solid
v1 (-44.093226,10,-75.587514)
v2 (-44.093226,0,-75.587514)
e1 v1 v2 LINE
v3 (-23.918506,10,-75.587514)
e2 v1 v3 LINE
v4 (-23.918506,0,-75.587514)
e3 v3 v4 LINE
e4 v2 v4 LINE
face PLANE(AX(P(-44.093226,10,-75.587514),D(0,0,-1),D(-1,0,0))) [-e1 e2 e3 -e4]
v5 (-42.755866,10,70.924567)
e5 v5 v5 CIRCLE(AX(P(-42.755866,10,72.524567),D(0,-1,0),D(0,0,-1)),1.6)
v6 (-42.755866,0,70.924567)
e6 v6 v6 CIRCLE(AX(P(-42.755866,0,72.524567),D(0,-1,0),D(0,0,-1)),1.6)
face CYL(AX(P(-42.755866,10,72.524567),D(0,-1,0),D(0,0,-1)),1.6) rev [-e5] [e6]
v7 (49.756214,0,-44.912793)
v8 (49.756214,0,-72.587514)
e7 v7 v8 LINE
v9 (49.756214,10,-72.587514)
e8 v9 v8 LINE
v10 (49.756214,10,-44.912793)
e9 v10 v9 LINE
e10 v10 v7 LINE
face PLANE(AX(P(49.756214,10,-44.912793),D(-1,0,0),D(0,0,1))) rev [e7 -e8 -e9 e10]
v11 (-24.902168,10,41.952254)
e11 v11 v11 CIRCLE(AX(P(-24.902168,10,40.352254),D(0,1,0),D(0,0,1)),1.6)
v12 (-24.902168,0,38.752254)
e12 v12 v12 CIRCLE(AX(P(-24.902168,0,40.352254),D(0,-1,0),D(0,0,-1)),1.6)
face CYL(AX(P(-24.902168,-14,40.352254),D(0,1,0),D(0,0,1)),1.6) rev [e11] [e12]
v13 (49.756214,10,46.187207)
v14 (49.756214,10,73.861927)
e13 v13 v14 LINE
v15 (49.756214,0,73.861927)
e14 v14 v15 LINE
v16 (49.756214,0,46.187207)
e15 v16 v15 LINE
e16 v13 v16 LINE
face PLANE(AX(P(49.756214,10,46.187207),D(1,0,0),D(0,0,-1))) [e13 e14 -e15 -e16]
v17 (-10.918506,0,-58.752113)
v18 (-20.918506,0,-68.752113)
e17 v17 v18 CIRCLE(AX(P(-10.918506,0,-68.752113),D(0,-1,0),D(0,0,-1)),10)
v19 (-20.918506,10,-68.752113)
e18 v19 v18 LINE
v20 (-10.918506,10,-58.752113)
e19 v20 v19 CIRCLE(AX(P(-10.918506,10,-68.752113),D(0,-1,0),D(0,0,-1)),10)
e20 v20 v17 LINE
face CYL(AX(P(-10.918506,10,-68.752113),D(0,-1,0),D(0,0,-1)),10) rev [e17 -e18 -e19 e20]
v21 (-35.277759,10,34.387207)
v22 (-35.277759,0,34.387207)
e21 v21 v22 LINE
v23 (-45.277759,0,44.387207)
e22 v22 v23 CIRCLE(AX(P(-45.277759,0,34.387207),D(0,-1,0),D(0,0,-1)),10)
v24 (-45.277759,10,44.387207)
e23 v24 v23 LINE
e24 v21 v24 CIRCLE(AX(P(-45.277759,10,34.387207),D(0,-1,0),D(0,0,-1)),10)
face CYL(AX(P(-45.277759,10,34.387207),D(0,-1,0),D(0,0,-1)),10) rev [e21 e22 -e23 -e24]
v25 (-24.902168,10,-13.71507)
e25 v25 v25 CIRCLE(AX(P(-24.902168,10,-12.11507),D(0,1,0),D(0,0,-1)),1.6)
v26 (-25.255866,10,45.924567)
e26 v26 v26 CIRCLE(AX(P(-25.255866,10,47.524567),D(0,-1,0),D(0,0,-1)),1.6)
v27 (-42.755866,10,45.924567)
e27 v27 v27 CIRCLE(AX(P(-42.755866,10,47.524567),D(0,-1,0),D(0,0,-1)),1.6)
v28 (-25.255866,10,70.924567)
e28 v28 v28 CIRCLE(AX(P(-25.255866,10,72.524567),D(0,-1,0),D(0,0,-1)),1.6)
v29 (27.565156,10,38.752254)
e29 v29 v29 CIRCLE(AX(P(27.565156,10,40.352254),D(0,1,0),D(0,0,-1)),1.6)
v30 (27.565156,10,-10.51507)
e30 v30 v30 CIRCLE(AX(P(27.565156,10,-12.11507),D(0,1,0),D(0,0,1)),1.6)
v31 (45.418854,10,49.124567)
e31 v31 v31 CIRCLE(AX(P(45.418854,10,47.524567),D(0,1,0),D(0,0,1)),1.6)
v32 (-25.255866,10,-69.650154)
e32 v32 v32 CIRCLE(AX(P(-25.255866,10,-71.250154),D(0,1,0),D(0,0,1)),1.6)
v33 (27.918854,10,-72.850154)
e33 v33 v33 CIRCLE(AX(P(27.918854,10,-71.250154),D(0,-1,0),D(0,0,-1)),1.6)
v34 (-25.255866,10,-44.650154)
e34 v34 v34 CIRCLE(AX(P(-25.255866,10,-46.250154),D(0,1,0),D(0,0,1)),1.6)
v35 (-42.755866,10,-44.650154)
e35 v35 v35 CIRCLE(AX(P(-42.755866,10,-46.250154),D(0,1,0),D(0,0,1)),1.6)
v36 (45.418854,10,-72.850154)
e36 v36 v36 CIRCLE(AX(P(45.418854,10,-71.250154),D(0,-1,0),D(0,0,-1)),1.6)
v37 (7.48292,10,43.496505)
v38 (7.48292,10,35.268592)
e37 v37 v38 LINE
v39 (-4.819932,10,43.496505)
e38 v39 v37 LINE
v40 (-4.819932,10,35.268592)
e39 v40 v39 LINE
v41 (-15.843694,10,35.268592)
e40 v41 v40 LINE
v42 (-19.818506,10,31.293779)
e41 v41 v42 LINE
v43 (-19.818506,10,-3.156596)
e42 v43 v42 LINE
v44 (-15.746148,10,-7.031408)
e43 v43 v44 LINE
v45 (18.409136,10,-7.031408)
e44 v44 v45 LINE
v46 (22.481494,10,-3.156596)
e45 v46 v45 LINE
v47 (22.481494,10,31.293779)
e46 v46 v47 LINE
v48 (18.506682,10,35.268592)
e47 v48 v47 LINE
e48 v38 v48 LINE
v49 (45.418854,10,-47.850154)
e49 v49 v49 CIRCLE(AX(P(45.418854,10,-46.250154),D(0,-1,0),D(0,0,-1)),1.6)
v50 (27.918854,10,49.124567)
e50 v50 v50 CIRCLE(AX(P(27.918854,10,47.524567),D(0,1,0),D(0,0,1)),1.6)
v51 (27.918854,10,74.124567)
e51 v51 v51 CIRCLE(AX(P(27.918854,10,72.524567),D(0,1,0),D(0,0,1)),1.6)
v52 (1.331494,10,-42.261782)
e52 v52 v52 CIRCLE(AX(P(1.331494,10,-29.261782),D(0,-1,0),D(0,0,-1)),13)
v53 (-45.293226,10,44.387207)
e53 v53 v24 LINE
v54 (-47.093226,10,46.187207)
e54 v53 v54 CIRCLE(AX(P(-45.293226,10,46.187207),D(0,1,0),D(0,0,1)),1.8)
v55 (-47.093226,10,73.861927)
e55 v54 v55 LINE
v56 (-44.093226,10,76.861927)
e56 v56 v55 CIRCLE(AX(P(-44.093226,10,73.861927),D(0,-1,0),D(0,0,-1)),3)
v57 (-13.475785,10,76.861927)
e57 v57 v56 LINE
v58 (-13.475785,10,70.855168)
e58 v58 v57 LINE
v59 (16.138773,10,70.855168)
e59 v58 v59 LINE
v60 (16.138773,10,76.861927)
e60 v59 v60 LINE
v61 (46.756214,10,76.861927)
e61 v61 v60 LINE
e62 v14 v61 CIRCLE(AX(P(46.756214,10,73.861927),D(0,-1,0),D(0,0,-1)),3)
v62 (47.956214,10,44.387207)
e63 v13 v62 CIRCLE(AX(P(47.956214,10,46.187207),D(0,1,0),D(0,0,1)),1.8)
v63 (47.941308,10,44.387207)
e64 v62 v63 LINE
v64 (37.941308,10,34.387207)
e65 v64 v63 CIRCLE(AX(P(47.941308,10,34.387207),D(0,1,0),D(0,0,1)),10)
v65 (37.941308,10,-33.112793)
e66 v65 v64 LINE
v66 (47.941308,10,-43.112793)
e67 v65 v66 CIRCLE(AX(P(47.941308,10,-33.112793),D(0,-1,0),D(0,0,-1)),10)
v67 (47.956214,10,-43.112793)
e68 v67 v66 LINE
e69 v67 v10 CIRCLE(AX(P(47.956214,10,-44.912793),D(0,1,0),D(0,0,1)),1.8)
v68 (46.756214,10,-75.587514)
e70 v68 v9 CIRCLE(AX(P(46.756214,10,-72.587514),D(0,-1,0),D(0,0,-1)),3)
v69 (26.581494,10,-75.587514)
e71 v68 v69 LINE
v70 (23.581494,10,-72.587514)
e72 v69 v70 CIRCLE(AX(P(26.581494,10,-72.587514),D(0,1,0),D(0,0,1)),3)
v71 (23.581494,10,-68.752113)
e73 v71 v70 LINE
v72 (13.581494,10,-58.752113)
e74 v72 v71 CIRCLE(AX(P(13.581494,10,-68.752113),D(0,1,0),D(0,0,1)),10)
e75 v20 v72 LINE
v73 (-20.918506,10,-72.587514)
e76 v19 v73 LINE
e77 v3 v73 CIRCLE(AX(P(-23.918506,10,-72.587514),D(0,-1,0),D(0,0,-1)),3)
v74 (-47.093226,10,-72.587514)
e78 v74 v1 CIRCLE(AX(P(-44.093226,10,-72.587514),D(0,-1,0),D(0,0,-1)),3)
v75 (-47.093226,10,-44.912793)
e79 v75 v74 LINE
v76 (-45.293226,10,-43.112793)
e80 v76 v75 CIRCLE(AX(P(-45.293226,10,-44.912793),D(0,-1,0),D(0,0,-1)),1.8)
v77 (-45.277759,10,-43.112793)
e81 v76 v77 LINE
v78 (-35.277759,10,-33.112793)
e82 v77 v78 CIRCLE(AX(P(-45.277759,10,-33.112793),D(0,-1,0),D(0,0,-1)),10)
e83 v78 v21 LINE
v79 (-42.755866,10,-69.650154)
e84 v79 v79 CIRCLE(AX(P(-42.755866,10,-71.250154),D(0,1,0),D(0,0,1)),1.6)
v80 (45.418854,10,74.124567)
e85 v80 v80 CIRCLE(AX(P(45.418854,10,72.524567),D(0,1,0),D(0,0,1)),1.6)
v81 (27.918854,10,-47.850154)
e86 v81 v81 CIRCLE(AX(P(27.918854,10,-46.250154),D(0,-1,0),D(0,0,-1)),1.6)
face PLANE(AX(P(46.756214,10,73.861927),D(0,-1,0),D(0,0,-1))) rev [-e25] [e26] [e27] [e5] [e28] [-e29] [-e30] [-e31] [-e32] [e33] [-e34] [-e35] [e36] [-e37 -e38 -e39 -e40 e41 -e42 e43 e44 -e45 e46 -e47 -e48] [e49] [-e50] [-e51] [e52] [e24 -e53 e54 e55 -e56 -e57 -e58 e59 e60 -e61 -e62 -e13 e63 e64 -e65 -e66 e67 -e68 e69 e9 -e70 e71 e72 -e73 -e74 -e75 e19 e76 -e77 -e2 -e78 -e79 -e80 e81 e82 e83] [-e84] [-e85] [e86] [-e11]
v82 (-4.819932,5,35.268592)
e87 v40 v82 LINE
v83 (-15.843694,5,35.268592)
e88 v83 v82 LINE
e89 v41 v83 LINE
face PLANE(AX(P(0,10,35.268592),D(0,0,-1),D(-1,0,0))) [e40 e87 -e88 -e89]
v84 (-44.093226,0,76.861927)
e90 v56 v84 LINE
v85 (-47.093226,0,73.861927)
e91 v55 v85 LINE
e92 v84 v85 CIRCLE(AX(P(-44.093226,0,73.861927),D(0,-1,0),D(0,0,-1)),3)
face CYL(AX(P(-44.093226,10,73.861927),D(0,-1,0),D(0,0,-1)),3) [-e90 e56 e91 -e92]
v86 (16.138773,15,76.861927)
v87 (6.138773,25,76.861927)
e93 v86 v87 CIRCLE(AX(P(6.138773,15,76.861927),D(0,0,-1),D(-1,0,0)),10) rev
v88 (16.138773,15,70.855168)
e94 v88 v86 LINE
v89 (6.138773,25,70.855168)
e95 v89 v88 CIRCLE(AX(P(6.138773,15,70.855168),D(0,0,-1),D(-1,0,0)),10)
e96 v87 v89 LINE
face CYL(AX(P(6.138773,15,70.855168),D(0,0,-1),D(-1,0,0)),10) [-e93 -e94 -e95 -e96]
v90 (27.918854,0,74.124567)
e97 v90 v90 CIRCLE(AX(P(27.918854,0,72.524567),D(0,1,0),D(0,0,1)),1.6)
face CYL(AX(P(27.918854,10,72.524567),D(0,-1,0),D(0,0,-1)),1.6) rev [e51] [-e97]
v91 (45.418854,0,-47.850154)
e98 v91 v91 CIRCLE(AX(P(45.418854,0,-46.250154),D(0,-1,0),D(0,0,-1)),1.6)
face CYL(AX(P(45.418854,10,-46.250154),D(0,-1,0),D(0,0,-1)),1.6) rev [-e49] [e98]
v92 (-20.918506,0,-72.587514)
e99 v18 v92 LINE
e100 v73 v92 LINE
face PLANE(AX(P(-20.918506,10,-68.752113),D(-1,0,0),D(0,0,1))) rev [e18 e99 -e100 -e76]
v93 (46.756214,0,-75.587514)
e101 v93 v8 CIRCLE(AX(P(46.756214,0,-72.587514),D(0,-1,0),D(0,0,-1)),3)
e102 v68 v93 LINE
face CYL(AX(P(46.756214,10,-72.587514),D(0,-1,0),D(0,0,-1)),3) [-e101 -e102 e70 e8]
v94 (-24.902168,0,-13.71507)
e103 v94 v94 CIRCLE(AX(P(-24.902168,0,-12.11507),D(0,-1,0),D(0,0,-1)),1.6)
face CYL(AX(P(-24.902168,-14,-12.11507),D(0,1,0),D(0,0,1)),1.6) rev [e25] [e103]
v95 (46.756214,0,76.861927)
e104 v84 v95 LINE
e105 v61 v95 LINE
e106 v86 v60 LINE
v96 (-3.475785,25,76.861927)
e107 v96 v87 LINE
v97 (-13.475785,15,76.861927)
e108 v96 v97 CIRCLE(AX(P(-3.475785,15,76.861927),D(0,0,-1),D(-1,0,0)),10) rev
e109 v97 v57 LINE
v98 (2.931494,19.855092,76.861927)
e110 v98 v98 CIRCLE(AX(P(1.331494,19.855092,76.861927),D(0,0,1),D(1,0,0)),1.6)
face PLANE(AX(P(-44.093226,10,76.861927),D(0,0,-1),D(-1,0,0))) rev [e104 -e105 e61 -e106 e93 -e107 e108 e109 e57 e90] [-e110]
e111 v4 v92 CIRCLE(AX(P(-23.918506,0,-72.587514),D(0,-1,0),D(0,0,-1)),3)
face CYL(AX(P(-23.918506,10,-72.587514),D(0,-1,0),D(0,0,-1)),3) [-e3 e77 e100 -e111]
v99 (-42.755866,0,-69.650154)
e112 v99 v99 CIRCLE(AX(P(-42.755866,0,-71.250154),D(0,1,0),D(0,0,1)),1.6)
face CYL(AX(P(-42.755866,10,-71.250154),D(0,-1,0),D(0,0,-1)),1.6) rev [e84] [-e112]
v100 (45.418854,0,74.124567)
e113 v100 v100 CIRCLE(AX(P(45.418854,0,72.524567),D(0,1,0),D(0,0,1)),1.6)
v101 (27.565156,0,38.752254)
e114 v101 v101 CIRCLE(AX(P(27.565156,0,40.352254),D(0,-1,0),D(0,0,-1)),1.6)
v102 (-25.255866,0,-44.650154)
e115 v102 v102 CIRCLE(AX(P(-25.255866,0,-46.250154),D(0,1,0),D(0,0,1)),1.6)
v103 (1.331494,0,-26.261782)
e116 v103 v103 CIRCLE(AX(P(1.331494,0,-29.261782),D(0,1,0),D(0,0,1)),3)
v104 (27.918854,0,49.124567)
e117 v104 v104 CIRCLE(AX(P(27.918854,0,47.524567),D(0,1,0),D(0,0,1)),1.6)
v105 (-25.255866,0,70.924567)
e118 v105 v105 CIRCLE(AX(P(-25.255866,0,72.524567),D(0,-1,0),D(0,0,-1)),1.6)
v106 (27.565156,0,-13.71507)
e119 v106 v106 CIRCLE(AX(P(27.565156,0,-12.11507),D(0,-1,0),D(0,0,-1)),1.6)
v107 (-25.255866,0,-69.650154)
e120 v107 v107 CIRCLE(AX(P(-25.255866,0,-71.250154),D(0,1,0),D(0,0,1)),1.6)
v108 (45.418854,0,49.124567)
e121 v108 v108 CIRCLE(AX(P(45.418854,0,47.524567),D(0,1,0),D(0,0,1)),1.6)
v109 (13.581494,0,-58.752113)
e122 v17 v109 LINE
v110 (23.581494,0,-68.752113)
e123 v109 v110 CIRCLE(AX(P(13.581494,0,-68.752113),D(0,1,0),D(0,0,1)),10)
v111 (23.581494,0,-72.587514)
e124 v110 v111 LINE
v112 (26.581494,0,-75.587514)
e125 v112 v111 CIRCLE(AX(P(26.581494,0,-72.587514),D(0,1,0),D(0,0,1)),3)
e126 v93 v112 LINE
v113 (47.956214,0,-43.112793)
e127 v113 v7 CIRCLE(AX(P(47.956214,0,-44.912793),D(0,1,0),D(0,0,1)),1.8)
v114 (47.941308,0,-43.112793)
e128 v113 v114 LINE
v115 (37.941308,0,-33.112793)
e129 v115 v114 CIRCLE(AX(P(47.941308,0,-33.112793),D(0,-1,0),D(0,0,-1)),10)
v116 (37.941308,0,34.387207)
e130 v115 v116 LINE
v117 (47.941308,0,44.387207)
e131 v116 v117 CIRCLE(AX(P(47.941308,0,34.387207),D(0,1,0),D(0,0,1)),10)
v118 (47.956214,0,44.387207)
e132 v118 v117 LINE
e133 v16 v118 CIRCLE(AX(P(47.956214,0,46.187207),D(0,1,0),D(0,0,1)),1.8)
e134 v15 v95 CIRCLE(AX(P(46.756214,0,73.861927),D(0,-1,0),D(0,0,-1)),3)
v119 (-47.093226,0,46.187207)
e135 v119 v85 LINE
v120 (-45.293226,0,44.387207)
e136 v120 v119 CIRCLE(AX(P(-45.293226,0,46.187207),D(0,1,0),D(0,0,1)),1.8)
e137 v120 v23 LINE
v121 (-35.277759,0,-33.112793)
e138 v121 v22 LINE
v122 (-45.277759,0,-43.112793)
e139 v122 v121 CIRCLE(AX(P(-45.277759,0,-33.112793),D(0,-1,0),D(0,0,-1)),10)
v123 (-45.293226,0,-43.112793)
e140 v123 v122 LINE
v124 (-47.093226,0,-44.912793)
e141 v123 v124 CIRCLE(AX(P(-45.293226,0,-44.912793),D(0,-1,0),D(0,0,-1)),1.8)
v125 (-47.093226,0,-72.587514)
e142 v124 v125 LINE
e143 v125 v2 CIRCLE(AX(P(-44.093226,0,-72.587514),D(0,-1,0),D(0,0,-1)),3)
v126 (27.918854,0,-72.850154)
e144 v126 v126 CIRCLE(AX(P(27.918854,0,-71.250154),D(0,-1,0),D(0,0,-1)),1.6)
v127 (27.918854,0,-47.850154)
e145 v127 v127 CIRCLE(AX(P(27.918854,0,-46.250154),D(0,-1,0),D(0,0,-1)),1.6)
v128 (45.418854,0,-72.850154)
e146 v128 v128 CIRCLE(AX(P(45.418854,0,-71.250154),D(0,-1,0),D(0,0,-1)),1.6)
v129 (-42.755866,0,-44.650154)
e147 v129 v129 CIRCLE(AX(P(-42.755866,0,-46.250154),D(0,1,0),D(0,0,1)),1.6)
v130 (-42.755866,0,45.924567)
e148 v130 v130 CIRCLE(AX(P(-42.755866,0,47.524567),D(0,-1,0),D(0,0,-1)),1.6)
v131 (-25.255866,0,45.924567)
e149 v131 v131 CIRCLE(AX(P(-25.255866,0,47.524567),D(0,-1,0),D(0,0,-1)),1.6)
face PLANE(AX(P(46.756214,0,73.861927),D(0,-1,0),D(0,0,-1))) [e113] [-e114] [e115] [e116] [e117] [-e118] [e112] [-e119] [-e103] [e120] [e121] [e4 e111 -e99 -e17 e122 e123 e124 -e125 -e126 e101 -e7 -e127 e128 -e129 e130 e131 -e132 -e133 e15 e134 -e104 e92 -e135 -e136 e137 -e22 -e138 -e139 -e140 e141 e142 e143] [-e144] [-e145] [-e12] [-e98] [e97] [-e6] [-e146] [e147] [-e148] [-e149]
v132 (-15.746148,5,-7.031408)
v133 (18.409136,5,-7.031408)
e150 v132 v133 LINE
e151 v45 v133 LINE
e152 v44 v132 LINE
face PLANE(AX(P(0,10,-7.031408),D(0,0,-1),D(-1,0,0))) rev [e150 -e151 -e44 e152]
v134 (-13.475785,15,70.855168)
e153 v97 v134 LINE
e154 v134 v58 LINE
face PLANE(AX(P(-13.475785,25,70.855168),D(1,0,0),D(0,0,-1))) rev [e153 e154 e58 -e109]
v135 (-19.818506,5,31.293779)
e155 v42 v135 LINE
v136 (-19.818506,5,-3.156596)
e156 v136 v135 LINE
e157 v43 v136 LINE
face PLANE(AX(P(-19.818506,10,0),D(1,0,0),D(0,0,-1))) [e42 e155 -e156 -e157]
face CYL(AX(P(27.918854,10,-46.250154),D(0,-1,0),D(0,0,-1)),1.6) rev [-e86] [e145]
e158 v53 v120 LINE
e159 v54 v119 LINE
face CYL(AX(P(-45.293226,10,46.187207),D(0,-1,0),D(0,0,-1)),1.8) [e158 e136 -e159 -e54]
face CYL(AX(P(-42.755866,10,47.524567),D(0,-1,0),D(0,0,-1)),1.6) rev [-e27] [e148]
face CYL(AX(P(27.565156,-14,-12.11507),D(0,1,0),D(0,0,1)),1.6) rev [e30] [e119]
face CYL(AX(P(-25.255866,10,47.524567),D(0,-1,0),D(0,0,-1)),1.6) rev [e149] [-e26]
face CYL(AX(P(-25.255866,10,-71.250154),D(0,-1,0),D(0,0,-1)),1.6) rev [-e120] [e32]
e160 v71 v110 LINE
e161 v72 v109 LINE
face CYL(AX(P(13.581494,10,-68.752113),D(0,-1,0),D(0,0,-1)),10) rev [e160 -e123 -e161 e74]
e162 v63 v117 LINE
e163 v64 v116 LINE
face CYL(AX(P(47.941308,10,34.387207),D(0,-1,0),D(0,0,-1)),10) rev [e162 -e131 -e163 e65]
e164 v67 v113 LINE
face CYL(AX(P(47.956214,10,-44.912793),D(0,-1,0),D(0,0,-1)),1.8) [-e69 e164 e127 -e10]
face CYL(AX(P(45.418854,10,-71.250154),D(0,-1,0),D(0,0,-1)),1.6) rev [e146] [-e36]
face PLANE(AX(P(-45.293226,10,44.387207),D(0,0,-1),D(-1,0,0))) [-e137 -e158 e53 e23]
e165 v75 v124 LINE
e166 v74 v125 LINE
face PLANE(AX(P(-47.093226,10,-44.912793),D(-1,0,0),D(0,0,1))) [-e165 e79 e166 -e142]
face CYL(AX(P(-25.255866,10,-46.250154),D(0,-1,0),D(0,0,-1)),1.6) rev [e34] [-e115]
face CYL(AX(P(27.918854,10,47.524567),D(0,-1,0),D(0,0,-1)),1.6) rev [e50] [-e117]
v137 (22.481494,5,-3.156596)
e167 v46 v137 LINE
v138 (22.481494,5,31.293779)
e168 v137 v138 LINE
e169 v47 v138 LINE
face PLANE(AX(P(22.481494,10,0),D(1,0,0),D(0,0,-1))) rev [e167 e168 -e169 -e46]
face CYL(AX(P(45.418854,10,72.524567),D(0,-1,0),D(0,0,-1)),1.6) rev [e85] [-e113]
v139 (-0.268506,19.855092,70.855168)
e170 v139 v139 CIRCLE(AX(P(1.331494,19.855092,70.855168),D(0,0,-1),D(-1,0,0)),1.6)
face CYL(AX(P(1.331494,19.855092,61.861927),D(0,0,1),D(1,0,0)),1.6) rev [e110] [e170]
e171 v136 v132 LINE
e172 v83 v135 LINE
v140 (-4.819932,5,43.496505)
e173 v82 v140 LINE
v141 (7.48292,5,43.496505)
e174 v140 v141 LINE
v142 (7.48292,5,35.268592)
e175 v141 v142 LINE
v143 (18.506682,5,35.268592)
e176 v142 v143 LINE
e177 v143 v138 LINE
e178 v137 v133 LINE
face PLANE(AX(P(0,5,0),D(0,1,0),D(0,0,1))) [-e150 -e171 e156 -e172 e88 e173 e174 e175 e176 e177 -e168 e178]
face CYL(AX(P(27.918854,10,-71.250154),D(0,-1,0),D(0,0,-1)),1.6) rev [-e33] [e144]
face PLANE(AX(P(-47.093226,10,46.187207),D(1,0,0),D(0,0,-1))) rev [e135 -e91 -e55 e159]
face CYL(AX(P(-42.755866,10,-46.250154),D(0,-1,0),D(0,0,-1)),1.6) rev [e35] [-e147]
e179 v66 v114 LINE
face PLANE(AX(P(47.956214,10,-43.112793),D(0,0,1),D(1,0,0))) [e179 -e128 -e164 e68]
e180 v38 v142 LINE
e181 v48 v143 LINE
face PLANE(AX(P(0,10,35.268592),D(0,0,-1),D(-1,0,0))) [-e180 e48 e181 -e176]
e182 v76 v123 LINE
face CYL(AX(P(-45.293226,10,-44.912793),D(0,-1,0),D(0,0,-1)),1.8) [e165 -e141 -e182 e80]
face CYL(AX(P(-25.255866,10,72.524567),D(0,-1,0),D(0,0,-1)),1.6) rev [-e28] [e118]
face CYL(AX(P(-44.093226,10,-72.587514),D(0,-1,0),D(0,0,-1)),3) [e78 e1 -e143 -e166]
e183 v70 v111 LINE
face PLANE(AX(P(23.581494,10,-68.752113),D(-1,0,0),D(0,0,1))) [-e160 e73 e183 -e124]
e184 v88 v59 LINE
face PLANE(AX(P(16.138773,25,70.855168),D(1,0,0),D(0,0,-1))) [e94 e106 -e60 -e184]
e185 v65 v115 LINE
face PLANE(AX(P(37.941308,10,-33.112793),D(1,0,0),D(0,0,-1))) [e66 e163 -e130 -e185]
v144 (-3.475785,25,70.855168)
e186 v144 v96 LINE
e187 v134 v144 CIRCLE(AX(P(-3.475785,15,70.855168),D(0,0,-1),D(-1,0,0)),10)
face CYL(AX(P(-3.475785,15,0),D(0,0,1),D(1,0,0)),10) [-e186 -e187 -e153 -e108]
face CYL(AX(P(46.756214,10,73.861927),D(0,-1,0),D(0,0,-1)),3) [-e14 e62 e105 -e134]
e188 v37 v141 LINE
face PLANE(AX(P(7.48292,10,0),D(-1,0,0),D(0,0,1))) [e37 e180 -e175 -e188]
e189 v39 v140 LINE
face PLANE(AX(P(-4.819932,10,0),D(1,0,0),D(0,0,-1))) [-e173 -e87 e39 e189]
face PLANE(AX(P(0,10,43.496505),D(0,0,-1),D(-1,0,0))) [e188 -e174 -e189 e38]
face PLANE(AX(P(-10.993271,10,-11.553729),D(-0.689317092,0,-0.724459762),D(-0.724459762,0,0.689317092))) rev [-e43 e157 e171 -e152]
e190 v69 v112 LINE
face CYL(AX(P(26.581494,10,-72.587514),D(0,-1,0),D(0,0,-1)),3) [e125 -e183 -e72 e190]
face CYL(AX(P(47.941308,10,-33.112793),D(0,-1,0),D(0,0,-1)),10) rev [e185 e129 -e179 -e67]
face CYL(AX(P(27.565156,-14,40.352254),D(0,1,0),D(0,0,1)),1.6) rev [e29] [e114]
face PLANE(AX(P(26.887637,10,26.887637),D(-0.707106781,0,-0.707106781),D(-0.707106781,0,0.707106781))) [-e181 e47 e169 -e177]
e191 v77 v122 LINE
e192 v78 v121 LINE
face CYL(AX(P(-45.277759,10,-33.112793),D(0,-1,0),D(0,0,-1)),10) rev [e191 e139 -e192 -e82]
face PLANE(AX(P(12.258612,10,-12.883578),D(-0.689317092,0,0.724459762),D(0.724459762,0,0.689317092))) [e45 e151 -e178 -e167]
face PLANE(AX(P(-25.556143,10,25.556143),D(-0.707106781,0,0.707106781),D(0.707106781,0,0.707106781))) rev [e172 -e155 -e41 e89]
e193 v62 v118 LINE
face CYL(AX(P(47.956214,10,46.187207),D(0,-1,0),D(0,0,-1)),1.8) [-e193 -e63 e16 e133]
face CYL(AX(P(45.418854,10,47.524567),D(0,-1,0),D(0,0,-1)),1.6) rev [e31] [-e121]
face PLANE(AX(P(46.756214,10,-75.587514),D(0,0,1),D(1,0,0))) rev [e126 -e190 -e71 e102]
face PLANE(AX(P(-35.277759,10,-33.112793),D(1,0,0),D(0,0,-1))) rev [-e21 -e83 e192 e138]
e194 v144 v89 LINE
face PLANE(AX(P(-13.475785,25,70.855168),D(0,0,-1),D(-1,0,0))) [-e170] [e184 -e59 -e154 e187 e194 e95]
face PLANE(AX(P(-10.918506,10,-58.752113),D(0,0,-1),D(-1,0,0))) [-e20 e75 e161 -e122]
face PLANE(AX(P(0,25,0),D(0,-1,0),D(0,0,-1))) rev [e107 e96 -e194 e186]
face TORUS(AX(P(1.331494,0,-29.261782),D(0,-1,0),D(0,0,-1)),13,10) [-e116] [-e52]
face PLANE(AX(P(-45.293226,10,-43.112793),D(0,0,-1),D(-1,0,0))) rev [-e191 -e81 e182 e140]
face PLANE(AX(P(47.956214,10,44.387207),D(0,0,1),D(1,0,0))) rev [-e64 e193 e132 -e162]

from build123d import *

# Parameters (mm, degrees)
SKETCH1_R           = 1.6
SKETCH1_R_2         = 3
BOSS_EXTRUDE1_DEPTH = 10
BOSS_EXTRUDE2_DEPTH = 5
SKETCH3_R           = 1.6
CUT_EXTRUDE2_DEPTH  = 24
FILLET1_R           = 10
SKETCH4_W           = 29.614558854
SKETCH4_H           = 6.006759352
BOSS_EXTRUDE3_DEPTH = 15
FILLET2_R           = 10
SKETCH5_R           = 1.6
CUT_EXTRUDE3_DEPTH  = 15


with BuildPart() as part:
    # Sketch1 → Boss-Extrude1 (new body)
    with BuildSketch(Plane(origin=(0, 0, 0), x_dir=(1, 0, 0), z_dir=(0, 1, 0))):
        with BuildLine():
            Line((13.581493994, 58.752113328), (-10.918506006, 58.752113328))
            ThreePointArc((-10.918506006, 58.752113328), (-17.989573818, 61.681045517), (-20.918506006, 68.752113328))
            Line((-20.918506006, 68.752113328), (-20.918506006, 72.587513875))
            ThreePointArc((-20.918506006, 72.587513875), (-21.797185662, 74.708834218), (-23.918506006, 75.587513875))
            Line((-23.918506006, 75.587513875), (-44.093226465, 75.587513875))
            ThreePointArc((-44.093226465, 75.587513875), (-46.214546809, 74.708834218), (-47.093226465, 72.587513875))
            Line((-47.093226465, 72.587513875), (-47.093226465, 44.912793415))
            ThreePointArc((-47.093226465, 44.912793415), (-46.566018672, 43.640001209), (-45.293226465, 43.112793415))
            Line((-45.293226465, 43.112793415), (-45.277758982, 43.112793415))
            ThreePointArc((-45.277758982, 43.112793415), (-38.20669117, 40.183861227), (-35.277758982, 33.112793415))
            Line((-35.277758982, 33.112793415), (-35.277758982, -34.387206585))
            ThreePointArc((-35.277758982, -34.387206585), (-38.20669117, -41.458274396), (-45.277758982, -44.387206585))
            Line((-45.277758982, -44.387206585), (-45.293226465, -44.387206585))
            ThreePointArc((-45.293226465, -44.387206585), (-46.566018672, -44.914414378), (-47.093226465, -46.187206585))
            Line((-47.093226465, -46.187206585), (-47.093226465, -73.861927044))
            ThreePointArc((-47.093226465, -73.861927044), (-46.214546809, -75.983247388), (-44.093226465, -76.861927044))
            Line((-44.093226465, -76.861927044), (46.756214453, -76.861927044))
            ThreePointArc((46.756214453, -76.861927044), (48.877534797, -75.983247388), (49.756214453, -73.861927044))
            Line((49.756214453, -73.861927044), (49.756214453, -46.187206585))
            ThreePointArc((49.756214453, -46.187206585), (49.22900666, -44.914414378), (47.956214453, -44.387206585))
            Line((47.956214453, -44.387206585), (47.94130771, -44.387206585))
            ThreePointArc((47.94130771, -44.387206585), (40.870239898, -41.458274396), (37.94130771, -34.387206585))
            Line((37.94130771, -34.387206585), (37.94130771, 33.112793415))
            ThreePointArc((37.94130771, 33.112793415), (40.870239898, 40.183861227), (47.94130771, 43.112793415))
            Line((47.94130771, 43.112793415), (47.956214453, 43.112793415))
            ThreePointArc((47.956214453, 43.112793415), (49.22900666, 43.640001209), (49.756214453, 44.912793415))
            Line((49.756214453, 44.912793415), (49.756214453, 72.587513875))
            ThreePointArc((49.756214453, 72.587513875), (48.877534797, 74.708834218), (46.756214453, 75.587513875))
            Line((46.756214453, 75.587513875), (26.581493994, 75.587513875))
            ThreePointArc((26.581493994, 75.587513875), (24.46017365, 74.708834218), (23.581493994, 72.587513875))
            Line((23.581493994, 72.587513875), (23.581493994, 68.752113328))
            ThreePointArc((23.581493994, 68.752113328), (20.652561806, 61.681045517), (13.581493994, 58.752113328))
        make_face()
        with Locations(Location((-42.755866236, -47.524566814, 0), (0, 0, 90))):
            Circle(SKETCH1_R, mode=Mode.SUBTRACT)
        with Locations(Location((-25.255866236, -47.524566814, 0), (0, 0, 90))):
            Circle(SKETCH1_R, mode=Mode.SUBTRACT)
        with Locations(Location((-25.255866236, -72.524566814, 0), (0, 0, 90))):
            Circle(SKETCH1_R, mode=Mode.SUBTRACT)
        with Locations(Location((-42.755866236, -72.524566814, 0), (0, 0, 90))):
            Circle(SKETCH1_R, mode=Mode.SUBTRACT)
        Polygon((-15.746148386, 7.031408071), (18.409136374, 7.031408071), (22.481493994, 3.156595611), (22.481493994, -31.29377947), (18.506681534, -35.268591929), (7.482919934, -35.268591929), (7.482919934, -43.496504735), (-4.819931946, -43.496504735), (-4.819931946, -35.268591929), (-15.843693546, -35.268591929), (-19.818506006, -31.29377947), (-19.818506006, 3.156595611), align=None, mode=Mode.SUBTRACT)
        with Locations(Location((45.418854224, -72.524566814, 0), (0, 0, 270))):
            Circle(SKETCH1_R, mode=Mode.SUBTRACT)
        with Locations(Location((27.918854224, -72.524566814, 0), (0, 0, 270))):
            Circle(SKETCH1_R, mode=Mode.SUBTRACT)
        with Locations(Location((27.918854224, -47.524566814, 0), (0, 0, 270))):
            Circle(SKETCH1_R, mode=Mode.SUBTRACT)
        with Locations(Location((45.418854224, -47.524566814, 0), (0, 0, 270))):
            Circle(SKETCH1_R, mode=Mode.SUBTRACT)
        with Locations(Location((1.331493994, 29.261782359, 0), (0, 0, 270))):
            Circle(SKETCH1_R_2, mode=Mode.SUBTRACT)
        with Locations(Location((-42.755866236, 71.250153645, 0), (0, 0, 270))):
            Circle(SKETCH1_R, mode=Mode.SUBTRACT)
        with Locations(Location((-42.755866236, 46.250153645, 0), (0, 0, 270))):
            Circle(SKETCH1_R, mode=Mode.SUBTRACT)
        with Locations(Location((-25.255866236, 46.250153645, 0), (0, 0, 270))):
            Circle(SKETCH1_R, mode=Mode.SUBTRACT)
        with Locations(Location((-25.255866236, 71.250153645, 0), (0, 0, 270))):
            Circle(SKETCH1_R, mode=Mode.SUBTRACT)
        with Locations(Location((27.918854224, 46.250153645, 0), (0, 0, 90))):
            Circle(SKETCH1_R, mode=Mode.SUBTRACT)
        with Locations(Location((27.918854224, 71.250153645, 0), (0, 0, 90))):
            Circle(SKETCH1_R, mode=Mode.SUBTRACT)
        with Locations(Location((45.418854224, 71.250153645, 0), (0, 0, 90))):
            Circle(SKETCH1_R, mode=Mode.SUBTRACT)
        with Locations(Location((45.418854224, 46.250153645, 0), (0, 0, 90))):
            Circle(SKETCH1_R, mode=Mode.SUBTRACT)
    extrude(amount=BOSS_EXTRUDE1_DEPTH)

    # Sketch1<3> → Boss-Extrude2 (add)
    with BuildSketch(Plane(origin=(0, 0, 0), x_dir=(1, 0, 0), z_dir=(0, 1, 0))):
        Polygon((18.409136374, 7.031408071), (-15.746148386, 7.031408071), (-19.818506006, 3.156595611), (-19.818506006, -31.29377947), (-15.843693546, -35.268591929), (-4.819931946, -35.268591929), (-4.819931946, -43.496504735), (7.482919934, -43.496504735), (7.482919934, -35.268591929), (18.506681534, -35.268591929), (22.481493994, -31.29377947), (22.481493994, 3.156595611), align=None)
    extrude(amount=BOSS_EXTRUDE2_DEPTH)

    # Sketch3 → Cut-Extrude2 (cut)
    with BuildSketch(Plane(origin=(0, 10, 0), x_dir=(1, 0, 0), z_dir=(0, 1, 0))):
        with Locations(Location((-24.902167588, -40.352253511, 0), (0, 0, 270))):
            Circle(SKETCH3_R)
        with Locations(Location((27.565155576, -40.352253511, 0), (0, 0, 90))):
            Circle(SKETCH3_R)
        with Locations(Location((27.565155576, 12.115069653, 0), (0, 0, 270))):
            Circle(SKETCH3_R)
        with Locations(Location((-24.902167588, 12.115069653, 0), (0, 0, 90))):
            Circle(SKETCH3_R)
    extrude(amount=-CUT_EXTRUDE2_DEPTH, mode=Mode.SUBTRACT)

    # Fillet1
    fillet1_edges = [part.edges().sort_by_distance(p)[0] for p in [
        (1.331493994, 10, -32.261782359),
    ]]
    fillet(fillet1_edges, radius=FILLET1_R - 0.0001)  # a hair under: the kernel refuses the full size

    # Sketch4 → Boss-Extrude3 (add)
    with BuildSketch(Plane(origin=(0, 10, 0), x_dir=(1, 0, 0), z_dir=(0, 1, 0))):
        with Locations((1.331493994, -73.858547368)):
            Rectangle(SKETCH4_W, SKETCH4_H)
    extrude(amount=BOSS_EXTRUDE3_DEPTH)

    # Fillet2
    fillet2_edges = [part.edges().sort_by_distance(p)[0] for p in [
        (16.138773421, 25, 73.858547368),
        (-13.475785433, 25, 73.858547368),
    ]]
    fillet(fillet2_edges, radius=FILLET2_R)

    # Sketch5 → Cut-Extrude3 (cut)
    with BuildSketch(Plane.XY.offset(76.861927044)):
        with Locations((1.331493994, 19.855091715)):
            Circle(SKETCH5_R)
    extrude(amount=-CUT_EXTRUDE3_DEPTH, mode=Mode.SUBTRACT)


solid = part.part
